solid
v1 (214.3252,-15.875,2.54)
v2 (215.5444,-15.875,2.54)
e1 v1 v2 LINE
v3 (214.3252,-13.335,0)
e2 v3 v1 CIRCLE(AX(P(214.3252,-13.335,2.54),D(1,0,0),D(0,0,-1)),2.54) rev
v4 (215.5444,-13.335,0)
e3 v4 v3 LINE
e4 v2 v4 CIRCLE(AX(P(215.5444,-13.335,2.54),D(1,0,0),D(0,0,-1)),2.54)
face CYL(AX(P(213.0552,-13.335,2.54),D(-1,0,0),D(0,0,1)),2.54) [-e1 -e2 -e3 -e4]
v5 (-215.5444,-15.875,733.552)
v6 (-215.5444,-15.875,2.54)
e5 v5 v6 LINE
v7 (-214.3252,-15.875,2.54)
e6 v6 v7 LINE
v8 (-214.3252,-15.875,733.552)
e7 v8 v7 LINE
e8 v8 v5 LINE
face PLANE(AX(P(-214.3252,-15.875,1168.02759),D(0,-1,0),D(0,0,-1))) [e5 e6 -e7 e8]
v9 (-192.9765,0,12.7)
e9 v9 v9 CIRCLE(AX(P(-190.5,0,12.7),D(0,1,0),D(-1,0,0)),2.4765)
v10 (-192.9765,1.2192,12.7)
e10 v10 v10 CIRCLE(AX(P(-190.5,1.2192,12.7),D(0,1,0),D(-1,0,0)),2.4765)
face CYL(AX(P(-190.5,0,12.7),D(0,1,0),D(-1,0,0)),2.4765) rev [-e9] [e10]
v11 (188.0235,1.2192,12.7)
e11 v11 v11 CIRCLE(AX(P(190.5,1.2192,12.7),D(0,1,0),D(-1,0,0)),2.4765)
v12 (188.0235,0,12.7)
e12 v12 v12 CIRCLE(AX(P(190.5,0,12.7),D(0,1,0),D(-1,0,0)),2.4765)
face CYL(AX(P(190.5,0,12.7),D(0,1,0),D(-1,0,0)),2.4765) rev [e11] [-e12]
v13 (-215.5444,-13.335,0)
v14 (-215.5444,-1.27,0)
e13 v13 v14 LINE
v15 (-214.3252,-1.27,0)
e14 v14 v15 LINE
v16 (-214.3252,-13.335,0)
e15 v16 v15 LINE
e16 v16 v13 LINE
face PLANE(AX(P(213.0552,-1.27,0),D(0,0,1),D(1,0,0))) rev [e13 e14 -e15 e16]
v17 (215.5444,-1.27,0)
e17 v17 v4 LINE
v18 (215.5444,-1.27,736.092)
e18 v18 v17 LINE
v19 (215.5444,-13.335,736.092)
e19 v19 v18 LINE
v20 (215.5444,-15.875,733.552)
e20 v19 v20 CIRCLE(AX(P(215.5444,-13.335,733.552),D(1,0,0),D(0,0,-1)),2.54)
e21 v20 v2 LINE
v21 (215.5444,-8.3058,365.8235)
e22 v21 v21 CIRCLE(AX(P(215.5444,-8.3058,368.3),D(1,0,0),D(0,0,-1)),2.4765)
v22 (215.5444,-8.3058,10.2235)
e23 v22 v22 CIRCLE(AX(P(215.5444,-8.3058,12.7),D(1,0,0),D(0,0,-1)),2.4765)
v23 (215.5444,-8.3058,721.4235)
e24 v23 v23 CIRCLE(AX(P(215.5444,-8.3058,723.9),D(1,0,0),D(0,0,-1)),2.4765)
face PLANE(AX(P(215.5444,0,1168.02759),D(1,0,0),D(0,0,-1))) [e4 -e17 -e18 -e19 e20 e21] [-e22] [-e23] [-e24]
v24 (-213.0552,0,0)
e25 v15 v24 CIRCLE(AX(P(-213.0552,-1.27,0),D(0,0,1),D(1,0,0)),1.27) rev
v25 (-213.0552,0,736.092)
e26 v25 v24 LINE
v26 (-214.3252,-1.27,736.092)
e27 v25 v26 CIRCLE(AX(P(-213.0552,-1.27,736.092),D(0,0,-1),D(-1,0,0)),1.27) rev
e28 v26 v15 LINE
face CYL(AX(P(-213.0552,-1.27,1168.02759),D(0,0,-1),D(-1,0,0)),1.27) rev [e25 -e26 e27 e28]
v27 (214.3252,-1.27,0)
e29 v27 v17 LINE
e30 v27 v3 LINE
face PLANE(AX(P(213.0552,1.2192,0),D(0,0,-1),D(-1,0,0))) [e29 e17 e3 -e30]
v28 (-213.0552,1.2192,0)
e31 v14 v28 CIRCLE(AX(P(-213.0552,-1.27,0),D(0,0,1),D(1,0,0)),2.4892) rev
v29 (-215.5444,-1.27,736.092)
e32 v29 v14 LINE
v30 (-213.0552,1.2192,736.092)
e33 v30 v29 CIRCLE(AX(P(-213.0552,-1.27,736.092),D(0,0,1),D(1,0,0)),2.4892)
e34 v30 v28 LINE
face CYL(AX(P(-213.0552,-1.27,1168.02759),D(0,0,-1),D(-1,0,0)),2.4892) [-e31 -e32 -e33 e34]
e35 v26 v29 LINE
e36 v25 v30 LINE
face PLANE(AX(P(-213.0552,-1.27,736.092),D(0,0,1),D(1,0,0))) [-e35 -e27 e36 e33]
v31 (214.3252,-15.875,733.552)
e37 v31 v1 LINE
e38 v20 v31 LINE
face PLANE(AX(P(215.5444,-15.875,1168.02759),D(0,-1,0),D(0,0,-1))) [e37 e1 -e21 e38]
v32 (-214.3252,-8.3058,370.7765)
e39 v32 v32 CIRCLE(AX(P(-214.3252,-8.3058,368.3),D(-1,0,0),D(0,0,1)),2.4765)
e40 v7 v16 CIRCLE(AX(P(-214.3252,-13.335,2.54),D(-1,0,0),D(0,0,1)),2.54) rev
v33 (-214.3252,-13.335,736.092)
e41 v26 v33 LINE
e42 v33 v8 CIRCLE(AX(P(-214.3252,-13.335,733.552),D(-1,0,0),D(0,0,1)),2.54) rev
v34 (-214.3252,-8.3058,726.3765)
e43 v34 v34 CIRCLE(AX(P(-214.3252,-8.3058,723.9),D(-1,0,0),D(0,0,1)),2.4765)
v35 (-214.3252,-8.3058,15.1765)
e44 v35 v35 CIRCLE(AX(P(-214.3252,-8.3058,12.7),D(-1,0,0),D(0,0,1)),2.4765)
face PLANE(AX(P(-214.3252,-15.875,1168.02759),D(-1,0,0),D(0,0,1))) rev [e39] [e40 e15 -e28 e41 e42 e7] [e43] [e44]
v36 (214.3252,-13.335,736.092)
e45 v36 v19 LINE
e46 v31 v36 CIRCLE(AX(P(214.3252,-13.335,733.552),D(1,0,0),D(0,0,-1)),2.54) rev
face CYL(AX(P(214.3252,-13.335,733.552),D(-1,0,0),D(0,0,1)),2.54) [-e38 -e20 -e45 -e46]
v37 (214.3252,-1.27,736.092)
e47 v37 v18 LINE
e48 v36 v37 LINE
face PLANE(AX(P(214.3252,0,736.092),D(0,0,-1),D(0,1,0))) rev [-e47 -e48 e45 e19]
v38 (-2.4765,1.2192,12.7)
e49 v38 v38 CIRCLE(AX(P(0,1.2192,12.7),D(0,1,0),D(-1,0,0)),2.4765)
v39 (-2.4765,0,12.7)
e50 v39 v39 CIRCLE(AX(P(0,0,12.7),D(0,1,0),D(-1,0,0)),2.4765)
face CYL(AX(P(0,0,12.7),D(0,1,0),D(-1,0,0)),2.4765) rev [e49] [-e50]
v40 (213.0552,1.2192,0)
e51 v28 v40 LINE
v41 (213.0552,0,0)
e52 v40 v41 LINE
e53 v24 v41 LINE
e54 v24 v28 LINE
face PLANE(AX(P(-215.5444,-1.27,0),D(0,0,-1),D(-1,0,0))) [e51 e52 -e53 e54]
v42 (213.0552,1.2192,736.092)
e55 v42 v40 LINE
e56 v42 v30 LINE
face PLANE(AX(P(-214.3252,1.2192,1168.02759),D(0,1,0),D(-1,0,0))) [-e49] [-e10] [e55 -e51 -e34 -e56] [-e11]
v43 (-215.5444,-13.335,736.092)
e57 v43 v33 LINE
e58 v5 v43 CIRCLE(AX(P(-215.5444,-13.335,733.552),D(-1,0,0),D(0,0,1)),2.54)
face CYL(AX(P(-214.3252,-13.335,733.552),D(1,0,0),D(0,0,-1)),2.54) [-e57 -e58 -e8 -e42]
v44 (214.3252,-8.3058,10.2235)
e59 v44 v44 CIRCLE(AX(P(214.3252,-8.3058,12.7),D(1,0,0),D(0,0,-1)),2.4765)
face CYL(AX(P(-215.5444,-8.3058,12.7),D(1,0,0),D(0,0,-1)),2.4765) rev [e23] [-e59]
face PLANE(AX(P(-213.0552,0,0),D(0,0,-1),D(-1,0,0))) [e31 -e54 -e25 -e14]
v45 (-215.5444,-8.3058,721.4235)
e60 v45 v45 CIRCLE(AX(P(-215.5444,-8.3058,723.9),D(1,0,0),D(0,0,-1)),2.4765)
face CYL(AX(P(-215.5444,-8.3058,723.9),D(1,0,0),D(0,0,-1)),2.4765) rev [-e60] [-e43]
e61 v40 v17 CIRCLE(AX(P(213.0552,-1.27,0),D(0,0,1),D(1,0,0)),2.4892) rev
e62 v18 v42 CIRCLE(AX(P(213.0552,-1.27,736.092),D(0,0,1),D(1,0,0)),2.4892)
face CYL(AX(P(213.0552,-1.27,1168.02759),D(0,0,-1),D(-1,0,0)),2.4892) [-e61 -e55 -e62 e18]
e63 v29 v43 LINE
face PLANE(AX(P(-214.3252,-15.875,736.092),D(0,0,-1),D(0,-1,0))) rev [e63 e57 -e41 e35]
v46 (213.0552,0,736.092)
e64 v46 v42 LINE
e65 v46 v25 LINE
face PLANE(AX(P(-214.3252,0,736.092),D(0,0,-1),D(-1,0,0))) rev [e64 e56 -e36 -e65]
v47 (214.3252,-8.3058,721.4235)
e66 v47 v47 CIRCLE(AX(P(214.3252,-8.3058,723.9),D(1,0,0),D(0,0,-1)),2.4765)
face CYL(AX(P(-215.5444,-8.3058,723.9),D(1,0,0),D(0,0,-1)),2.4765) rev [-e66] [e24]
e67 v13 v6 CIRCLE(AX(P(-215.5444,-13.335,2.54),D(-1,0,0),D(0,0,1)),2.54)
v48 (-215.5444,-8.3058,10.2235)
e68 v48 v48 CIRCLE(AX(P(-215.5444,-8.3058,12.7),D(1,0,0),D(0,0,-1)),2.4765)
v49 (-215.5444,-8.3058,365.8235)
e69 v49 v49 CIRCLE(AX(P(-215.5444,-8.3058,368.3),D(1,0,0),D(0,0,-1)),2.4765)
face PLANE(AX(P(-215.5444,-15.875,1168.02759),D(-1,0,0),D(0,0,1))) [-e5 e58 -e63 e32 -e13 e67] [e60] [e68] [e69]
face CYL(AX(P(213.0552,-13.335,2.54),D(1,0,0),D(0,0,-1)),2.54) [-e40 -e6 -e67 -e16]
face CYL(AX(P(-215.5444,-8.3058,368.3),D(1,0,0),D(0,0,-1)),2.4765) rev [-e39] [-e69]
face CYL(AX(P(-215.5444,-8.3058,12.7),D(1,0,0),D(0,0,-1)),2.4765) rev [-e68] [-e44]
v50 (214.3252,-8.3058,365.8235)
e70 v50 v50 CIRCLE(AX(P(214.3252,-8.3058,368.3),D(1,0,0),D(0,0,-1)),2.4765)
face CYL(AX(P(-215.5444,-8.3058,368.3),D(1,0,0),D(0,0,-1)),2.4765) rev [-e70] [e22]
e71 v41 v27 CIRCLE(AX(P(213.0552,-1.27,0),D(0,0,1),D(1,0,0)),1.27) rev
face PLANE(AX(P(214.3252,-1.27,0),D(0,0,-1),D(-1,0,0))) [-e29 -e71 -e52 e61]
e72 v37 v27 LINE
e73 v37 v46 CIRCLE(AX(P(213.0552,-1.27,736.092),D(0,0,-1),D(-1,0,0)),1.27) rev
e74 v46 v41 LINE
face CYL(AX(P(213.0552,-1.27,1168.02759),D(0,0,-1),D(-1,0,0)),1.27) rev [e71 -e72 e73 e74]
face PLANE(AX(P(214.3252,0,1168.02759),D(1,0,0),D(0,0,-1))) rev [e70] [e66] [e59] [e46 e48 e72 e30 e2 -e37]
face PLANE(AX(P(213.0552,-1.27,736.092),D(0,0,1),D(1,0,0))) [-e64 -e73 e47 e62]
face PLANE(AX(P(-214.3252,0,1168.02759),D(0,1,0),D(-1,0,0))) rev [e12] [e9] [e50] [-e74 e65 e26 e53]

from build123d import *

# Parameters (mm, degrees)
BASE_FLANGE1_DEPTH = 736.092
FILLET1_R          = 2.54
SKETCH3_R          = 2.4765
CUT_EXTRUDE1_DEPTH = 854.182865261
SKETCH4_R          = 2.4765
CUT_EXTRUDE2_DEPTH = 1.2192


# Sheet-metal steps are written as plain solids
with BuildPart() as part:
    # Sketch1 → Base-Flange1 (new body)
    with BuildSketch(Plane.XY):
        with BuildLine():
            Line((-214.3252, -15.875), (-214.3252, -1.27))
            ThreePointArc((-214.3252, -1.27), (-213.953225612, -0.371974388), (-213.0552, 0))
            Line((-213.0552, 0), (213.0552, 0))
            ThreePointArc((213.0552, 0), (213.953225612, -0.371974388), (214.3252, -1.27))
            Line((214.3252, -1.27), (214.3252, -15.875))
            Line((214.3252, -15.875), (215.5444, -15.875))
            Line((215.5444, -15.875), (215.5444, -1.27))
            ThreePointArc((215.5444, -1.27), (214.8153302, 0.4901302), (213.0552, 1.2192))
            Line((213.0552, 1.2192), (-213.0552, 1.2192))
            ThreePointArc((-213.0552, 1.2192), (-214.8153302, 0.4901302), (-215.5444, -1.27))
            Line((-215.5444, -1.27), (-215.5444, -15.875))
            Line((-215.5444, -15.875), (-214.3252, -15.875))
        make_face()
    extrude(amount=BASE_FLANGE1_DEPTH)

    # Fillet1
    fillet1_edges = [part.edges().sort_by_distance(p)[0] for p in [
        (-214.9348, -15.875, 0),
        (214.9348, -15.875, 0),
        (214.9348, -15.875, 736.092),
        (-214.9348, -15.875, 736.092),
    ]]
    fillet(fillet1_edges, radius=FILLET1_R)

    # Sketch3 → Cut-Extrude1 (cut, through all)
    with BuildSketch(Plane(origin=(215.5444, 0, 0), x_dir=(0, 0, -1), z_dir=(1, 0, 0))):
        with Locations((-368.3, -8.3058)):
            Circle(SKETCH3_R)
        with Locations((-723.9, -8.3058)):
            Circle(SKETCH3_R)
        with Locations((-12.7, -8.3058)):
            Circle(SKETCH3_R)
    extrude(amount=-CUT_EXTRUDE1_DEPTH, mode=Mode.SUBTRACT)

    # Sketch4 → Cut-Extrude2 (cut)
    with BuildSketch(Plane(origin=(0, 1.2192, 0), x_dir=(1, 0, 0), z_dir=(0, 1, 0))):
        with Locations(Location((-190.5, -12.7, 0), (0, 0, 180))):
            Circle(SKETCH4_R)
        with Locations(Location((0, -12.7, 0), (0, 0, 180))):
            Circle(SKETCH4_R)
        with Locations(Location((190.5, -12.7, 0), (0, 0, 180))):
            Circle(SKETCH4_R)
    extrude(amount=-CUT_EXTRUDE2_DEPTH, mode=Mode.SUBTRACT)


solid = part.part
